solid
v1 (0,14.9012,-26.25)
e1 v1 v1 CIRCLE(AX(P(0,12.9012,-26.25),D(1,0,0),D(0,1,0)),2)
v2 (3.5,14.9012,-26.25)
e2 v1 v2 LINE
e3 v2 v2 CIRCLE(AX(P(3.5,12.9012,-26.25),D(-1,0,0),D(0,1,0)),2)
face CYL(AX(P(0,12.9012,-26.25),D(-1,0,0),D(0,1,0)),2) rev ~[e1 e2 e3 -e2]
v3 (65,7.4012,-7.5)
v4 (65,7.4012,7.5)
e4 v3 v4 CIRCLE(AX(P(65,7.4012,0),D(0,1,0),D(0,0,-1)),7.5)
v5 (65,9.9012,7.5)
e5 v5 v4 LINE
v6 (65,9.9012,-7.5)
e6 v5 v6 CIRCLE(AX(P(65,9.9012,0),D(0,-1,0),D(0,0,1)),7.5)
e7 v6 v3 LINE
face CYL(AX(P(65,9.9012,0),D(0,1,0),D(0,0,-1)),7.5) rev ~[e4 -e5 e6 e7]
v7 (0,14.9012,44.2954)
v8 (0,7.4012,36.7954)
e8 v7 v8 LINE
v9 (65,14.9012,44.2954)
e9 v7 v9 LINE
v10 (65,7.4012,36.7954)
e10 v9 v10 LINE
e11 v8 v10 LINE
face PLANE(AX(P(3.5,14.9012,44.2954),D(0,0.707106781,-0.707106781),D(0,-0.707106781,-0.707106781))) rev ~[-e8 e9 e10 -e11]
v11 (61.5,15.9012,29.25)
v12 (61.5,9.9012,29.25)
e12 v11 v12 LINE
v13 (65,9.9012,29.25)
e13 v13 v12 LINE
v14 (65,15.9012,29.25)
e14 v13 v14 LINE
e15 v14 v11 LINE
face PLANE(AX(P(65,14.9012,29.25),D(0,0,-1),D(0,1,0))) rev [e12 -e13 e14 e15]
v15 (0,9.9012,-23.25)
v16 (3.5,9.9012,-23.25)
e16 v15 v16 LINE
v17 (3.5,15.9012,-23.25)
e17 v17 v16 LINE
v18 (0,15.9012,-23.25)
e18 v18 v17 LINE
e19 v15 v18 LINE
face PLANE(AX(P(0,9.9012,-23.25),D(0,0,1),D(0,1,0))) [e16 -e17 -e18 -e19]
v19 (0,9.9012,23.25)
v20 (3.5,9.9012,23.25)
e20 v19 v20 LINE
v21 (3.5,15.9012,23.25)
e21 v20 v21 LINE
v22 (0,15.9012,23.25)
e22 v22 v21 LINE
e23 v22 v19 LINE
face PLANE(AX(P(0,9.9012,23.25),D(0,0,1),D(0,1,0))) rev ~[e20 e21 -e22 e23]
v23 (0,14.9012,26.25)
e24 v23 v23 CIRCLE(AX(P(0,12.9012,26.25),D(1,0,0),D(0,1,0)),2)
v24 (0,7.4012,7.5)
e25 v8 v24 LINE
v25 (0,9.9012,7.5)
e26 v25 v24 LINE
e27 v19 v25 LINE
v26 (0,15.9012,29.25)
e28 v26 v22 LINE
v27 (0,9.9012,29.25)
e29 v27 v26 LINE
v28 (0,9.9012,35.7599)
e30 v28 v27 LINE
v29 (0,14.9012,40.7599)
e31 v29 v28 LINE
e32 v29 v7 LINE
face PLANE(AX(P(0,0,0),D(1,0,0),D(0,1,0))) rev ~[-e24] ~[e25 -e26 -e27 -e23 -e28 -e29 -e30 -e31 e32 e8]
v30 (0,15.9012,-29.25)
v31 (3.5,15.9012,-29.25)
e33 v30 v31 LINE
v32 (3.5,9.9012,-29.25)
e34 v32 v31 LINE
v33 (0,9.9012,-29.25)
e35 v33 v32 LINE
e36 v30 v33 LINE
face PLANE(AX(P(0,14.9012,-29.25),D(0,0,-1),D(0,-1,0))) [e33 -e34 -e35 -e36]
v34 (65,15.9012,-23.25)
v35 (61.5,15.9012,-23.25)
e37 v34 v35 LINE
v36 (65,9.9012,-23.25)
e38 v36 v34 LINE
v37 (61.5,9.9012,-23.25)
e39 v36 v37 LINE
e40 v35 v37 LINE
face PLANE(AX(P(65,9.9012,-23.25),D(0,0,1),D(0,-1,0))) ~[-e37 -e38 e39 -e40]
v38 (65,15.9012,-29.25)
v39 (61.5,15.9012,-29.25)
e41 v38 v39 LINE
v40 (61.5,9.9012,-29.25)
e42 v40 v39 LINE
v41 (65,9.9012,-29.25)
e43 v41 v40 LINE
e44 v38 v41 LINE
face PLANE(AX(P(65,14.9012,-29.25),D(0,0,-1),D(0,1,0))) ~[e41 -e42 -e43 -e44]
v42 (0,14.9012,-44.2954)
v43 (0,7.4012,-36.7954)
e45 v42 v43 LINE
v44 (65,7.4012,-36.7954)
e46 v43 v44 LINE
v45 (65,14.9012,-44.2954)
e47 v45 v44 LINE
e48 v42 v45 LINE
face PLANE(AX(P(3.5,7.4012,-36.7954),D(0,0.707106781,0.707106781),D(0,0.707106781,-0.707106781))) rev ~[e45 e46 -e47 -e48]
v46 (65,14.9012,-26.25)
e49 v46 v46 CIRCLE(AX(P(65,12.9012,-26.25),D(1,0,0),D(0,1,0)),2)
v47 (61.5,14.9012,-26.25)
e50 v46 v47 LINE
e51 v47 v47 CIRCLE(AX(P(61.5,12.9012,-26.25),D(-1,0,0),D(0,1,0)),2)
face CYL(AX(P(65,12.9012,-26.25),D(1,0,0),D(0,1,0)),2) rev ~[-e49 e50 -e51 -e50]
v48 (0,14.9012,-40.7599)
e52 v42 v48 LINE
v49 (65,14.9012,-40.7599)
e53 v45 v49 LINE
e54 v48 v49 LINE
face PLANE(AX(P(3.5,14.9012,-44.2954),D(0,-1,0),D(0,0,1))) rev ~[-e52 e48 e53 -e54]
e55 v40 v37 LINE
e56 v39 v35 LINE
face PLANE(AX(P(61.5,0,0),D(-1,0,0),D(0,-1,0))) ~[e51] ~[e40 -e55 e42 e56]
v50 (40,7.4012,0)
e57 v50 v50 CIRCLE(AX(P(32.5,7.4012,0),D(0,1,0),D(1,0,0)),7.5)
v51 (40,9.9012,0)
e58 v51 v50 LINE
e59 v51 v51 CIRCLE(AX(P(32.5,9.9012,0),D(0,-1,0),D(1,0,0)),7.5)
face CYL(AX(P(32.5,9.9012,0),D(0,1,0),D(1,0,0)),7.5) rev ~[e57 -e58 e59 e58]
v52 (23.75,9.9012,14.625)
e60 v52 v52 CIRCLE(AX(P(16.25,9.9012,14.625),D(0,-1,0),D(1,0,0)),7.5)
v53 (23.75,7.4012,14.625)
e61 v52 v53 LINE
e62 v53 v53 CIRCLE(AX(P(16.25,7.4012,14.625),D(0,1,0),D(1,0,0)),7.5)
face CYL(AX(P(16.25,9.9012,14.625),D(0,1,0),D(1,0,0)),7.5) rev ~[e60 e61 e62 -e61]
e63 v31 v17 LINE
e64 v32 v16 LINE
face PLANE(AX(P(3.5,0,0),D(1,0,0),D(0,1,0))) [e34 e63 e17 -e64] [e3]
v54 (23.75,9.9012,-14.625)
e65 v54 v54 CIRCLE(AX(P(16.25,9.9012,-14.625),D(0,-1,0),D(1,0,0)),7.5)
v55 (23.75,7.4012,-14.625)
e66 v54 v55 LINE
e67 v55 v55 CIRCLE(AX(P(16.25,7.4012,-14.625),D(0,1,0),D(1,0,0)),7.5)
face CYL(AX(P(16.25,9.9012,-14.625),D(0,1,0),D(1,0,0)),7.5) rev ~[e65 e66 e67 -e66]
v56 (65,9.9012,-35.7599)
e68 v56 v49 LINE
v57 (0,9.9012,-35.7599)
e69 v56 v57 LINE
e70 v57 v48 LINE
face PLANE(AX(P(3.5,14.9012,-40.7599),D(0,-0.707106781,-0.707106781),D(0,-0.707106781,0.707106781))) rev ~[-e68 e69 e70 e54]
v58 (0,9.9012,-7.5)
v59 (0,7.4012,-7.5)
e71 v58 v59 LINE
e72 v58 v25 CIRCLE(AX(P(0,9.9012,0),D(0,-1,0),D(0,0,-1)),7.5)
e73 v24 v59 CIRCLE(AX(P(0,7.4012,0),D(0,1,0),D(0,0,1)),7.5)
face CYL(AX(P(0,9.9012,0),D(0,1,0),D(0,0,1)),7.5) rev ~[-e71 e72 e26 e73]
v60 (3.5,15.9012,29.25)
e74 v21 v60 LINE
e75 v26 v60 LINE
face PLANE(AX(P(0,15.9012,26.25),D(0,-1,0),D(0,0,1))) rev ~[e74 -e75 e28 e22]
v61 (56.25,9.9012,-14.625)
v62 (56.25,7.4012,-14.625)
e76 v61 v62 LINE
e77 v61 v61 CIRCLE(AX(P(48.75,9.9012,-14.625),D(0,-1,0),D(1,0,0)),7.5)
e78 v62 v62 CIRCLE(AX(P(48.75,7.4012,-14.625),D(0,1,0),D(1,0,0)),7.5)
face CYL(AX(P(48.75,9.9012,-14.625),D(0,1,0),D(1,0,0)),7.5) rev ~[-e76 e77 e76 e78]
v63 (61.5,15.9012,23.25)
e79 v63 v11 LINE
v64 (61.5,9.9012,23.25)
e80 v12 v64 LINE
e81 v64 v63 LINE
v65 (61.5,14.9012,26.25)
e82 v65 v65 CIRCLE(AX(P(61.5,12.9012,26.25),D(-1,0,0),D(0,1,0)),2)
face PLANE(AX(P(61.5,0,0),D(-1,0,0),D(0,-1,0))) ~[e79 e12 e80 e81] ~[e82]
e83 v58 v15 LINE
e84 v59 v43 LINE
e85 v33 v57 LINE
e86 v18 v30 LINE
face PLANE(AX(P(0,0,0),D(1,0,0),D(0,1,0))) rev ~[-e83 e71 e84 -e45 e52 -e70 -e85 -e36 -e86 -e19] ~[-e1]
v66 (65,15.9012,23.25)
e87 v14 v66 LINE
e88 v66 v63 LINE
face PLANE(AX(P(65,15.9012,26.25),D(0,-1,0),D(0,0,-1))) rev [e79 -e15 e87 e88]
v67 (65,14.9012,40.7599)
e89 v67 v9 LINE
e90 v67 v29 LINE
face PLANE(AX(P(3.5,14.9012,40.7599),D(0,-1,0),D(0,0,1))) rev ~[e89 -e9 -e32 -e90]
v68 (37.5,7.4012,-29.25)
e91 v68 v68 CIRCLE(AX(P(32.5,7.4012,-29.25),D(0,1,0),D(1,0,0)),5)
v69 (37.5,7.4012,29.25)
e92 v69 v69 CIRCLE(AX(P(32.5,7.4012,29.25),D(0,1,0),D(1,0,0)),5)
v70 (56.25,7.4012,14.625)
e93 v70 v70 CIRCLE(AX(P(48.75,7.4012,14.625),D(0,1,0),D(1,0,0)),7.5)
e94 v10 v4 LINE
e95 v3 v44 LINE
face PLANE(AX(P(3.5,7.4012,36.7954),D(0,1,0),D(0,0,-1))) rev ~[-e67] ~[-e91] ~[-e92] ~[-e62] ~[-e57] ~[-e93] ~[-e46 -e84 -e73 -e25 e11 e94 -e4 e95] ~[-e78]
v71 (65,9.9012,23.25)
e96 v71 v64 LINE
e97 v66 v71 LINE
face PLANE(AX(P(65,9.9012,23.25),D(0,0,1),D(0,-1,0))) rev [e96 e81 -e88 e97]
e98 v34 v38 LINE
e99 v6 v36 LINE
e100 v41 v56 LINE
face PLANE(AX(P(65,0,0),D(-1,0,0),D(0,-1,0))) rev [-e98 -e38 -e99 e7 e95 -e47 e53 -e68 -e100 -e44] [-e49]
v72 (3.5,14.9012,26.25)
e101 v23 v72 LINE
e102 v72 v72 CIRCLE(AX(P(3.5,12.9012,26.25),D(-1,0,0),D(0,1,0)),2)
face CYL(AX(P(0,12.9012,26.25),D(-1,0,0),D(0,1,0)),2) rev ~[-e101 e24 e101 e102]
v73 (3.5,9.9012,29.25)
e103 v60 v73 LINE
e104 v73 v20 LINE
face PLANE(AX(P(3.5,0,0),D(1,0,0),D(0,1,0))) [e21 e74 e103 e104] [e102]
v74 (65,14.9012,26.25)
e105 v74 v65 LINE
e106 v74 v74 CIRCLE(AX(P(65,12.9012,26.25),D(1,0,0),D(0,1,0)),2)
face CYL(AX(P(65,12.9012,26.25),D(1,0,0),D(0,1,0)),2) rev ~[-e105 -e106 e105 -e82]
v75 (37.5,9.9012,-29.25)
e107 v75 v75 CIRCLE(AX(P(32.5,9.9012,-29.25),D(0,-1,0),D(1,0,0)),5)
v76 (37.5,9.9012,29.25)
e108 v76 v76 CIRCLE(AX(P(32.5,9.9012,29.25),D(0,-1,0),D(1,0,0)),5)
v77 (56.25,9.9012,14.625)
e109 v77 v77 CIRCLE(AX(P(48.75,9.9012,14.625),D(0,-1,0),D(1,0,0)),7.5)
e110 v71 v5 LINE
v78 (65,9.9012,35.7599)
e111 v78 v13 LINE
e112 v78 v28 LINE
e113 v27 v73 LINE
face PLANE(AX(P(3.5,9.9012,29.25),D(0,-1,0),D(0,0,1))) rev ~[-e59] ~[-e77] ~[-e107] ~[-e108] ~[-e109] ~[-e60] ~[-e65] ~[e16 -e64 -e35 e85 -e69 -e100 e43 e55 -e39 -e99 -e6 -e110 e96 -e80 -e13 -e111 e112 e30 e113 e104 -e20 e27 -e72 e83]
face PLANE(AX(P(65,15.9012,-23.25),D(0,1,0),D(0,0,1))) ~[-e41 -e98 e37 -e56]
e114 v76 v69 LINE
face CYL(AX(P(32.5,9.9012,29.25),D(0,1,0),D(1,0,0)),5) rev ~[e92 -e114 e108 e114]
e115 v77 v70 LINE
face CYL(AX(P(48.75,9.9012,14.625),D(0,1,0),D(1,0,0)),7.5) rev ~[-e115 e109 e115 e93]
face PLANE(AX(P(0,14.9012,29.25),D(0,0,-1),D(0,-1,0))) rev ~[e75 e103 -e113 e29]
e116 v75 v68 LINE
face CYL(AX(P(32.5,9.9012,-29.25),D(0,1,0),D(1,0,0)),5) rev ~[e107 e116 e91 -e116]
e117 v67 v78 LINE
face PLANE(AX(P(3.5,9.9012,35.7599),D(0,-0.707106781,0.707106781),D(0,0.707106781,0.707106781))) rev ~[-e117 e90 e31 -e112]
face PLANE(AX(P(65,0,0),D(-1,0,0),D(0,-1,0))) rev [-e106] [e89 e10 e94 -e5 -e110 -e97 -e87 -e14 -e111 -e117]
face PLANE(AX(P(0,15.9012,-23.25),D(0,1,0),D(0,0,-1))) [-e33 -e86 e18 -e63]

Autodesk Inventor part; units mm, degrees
ref_plane "YZ Plane" through (0, 0, 0) normal (1, 0, 0) x (0, 1, 0)
ref_plane "XZ Plane" through (0, 0, 0) normal (0, 1, 0) x (-1, 0, 0)
ref_plane "XY Plane" through (0, 0, 0) normal (0, 0, 1) x (1, 0, 0)
sketch "Sketch1" plane through (0, 0, 0) normal (1, 0, 0) x (0, 1, 0)
  line L0 (21.7077, 51.1019) -> (7.4012, 36.7954)
  line L1 (7.4012, 36.7954) -> (7.4012, 0)
  line L2 (21.7077, 51.1019) -> (21.7077, 0)
  line L3 (7.4012, -36.7954) -> (7.4012, 0)
  line L4 (21.7077, -51.1019) -> (21.7077, 0)
  line L5 (21.7077, -51.1019) -> (7.4012, -36.7954)
  line L6 (21.7077, -51.1019) -> (21.7077, 51.1019)
  line L7 (17.1717, -14.2524) -> (13.4217, -14.2524)
  line L8 (13.4217, -14.2524) -> (11.5467, -17.5)
  line L9 (19.0467, -17.5) -> (17.1717, -14.2524)
  circle A0 centre (15.2967, -17.5) radius 3.75
  line L10 (17.1717, -20.7476) -> (19.0467, -17.5)
  line L11 (11.5467, -17.5) -> (13.4217, -20.7476)
  line L12 (13.4217, -20.7476) -> (17.1717, -20.7476)
  line L13 (17.1717, -31.7524) -> (13.4217, -31.7524)
  line L14 (19.0467, -35) -> (17.1717, -31.7524)
  line L15 (13.4217, -31.7524) -> (11.5467, -35)
  line L16 (13.4217, -38.2476) -> (17.1717, -38.2476)
  line L17 (17.1717, -38.2476) -> (19.0467, -35)
  line L18 (11.5467, -35) -> (13.4217, -38.2476)
  circle A1 centre (15.2967, -35) radius 3.75
  circle A2 centre (15.2967, 0) radius 3.75
  line L19 (13.4217, -3.2476) -> (17.1717, -3.2476)
  line L20 (17.1717, -3.2476) -> (19.0467, 0)
  line L21 (11.5467, 0) -> (13.4217, -3.2476)
  line L22 (13.4217, 3.2476) -> (11.5467, 0)
  line L23 (17.1717, 3.2476) -> (13.4217, 3.2476)
  line L24 (19.0467, 0) -> (17.1717, 3.2476)
  line L25 (13.4217, 14.2524) -> (17.1717, 14.2524)
  line L26 (11.5467, 17.5) -> (13.4217, 14.2524)
  line L27 (17.1717, 14.2524) -> (19.0467, 17.5)
  circle A3 centre (15.2967, 17.5) radius 3.75
  line L28 (19.0467, 17.5) -> (17.1717, 20.7476)
  line L29 (17.1717, 20.7476) -> (13.4217, 20.7476)
  line L30 (13.4217, 20.7476) -> (11.5467, 17.5)
  circle A4 centre (15.2967, 35) radius 3.75
  line L31 (13.4217, 31.7524) -> (17.1717, 31.7524)
  line L32 (11.5467, 35) -> (13.4217, 31.7524)
  line L33 (17.1717, 31.7524) -> (19.0467, 35)
  line L34 (19.0467, 35) -> (17.1717, 38.2476)
  line L35 (13.4217, 38.2476) -> (11.5467, 35)
  line L36 (17.1717, 38.2476) -> (13.4217, 38.2476)
  line L37 (21.7077, 47.5664) -> (7.4012, 33.2599)
  line L38 (9.9012, 39.2954) -> (9.9012, -39.2954)
  line L39 (7.4012, -33.2599) -> (21.7077, -47.5664)
  line L40 (15.2967, 35) -> (9.9012, 35)
  line L41 (9.9012, 26.25) -> (16.1703, 26.25)
  circle A5 centre (12.9012, 26.25) radius 2
  line L42 (9.9012, 23.25) -> (15.9012, 23.25)
  line L43 (15.9012, 23.25) -> (15.9012, 29.25)
  line L44 (15.9012, 29.25) -> (9.9012, 29.25)
  line L45 (9.9012, 29.25) -> (9.9012, 23.25)
  line L46 (9.9012, 23.25) -> (15.9012, 29.25) construction
  line L47 (15.9012, 23.25) -> (9.9012, 29.25) construction
  line L48 (9.9012, -26.25) -> (17.1717, -26.25)
  circle A6 centre (12.9012, -26.25) radius 2
  line L49 (15.9012, -29.25) -> (9.9012, -29.25)
  line L50 (9.9012, -29.25) -> (9.9012, -23.25)
  line L51 (9.9012, -23.25) -> (15.9012, -23.25)
  line L52 (15.9012, -23.25) -> (15.9012, -29.25)
  line L53 (15.9012, -29.25) -> (9.9012, -23.25) construction
  line L54 (9.9012, -29.25) -> (15.9012, -23.25) construction
  line L55 (15.9012, 53.3729) -> (15.9012, -51.1019)
  line L56 (9.9012, 26.25) -> (7.4012, 26.25)
  line L57 (14.9012, -60.8562) -> (14.9012, 66.1701)
  point P0 (9.9012, 35.7599)
  point P1 (9.9012, -35.7599)
  point P2 (14.9012, 40.7599)
  point P3 (14.9012, 44.2954)
  point P4 (14.9012, -44.2954)
  point P5 (14.9012, -40.7599)
  dimension "d33" = 2.5
  dimension "d34" = 2.5
  dimension "d35" = 2.5
  dimension "d36" = 8.75
  dimension "d37" = 4
  dimension "d38" = 3
  dimension "d39" = 6
  dimension "d40" = 8.75
  dimension "d41" = 4
  dimension "d42" = 3
  dimension "d43" = 6
  dimension "d48" = 8.5
  dimension "d49" = 7.5
extrude "Extrusion1" add sketch "Sketch1" along normal blind 3.5 contours L38 L37 L1 L0 | L0 L57 L37 L38 | L38 L56 L1 L37 | L56 L38 L39 L3 L1 | L44 L57 A5 L41 L38 | L41 A5 L57 L42 L38 | L44 L43 L41 L57 | L39 L38 L5 L3 | L41 L43 L42 L57 | L39 L57 L5 L38 | L51 L57 A6 L48 L38 | L38 L48 A6 L57 L49 | L51 L52 L48 L57 | L57 L48 L52 L49
sketch "Sketch2" plane through (3.5, 0, 0) normal (1, 0, 0) x (0, 0, -1)
  line L0 (-44.2954, 14.9012) -> (-36.7954, 7.4012) projected
  line L1 (-36.7954, 7.4012) -> (36.7954, 7.4012) projected
  line L2 (36.7954, 7.4012) -> (44.2954, 14.9012) projected
  line L3 (40.7599, 14.9012) -> (35.7599, 9.9012) projected
  line L4 (35.7599, 9.9012) -> (29.25, 9.9012) projected
  line L5 (29.25, 9.9012) -> (29.25, 15.9012) projected
  line L6 (29.25, 15.9012) -> (23.25, 15.9012) projected
  line L7 (23.25, 15.9012) -> (23.25, 9.9012) projected
  line L8 (23.25, 9.9012) -> (-23.25, 9.9012) projected
  line L9 (-23.25, 9.9012) -> (-23.25, 15.9012) projected
  line L10 (-23.25, 15.9012) -> (-29.25, 15.9012) projected
  line L11 (-29.25, 15.9012) -> (-29.25, 9.9012) projected
  line L12 (-29.25, 9.9012) -> (-35.7599, 9.9012) projected
  line L13 (-35.7599, 9.9012) -> (-40.7599, 14.9012) projected
  circle A0 centre (-26.25, 12.9012) radius 2 projected
  circle A1 centre (26.25, 12.9012) radius 2 projected
  line L14 (-29.25, 9.9012) -> (-23.25, 9.9012)
  line L15 (35.7599, 9.9012) -> (29.25, 9.9012) projected
  line L16 (23.25, 15.9012) -> (23.25, 9.9012) projected
  line L17 (29.25, 9.9012) -> (23.25, 9.9012)
  line L18 (-40.7599, 14.9012) -> (-44.2954, 14.9012) projected
  line L19 (44.2954, 14.9012) -> (40.7599, 14.9012) projected
  point P0 (0, 0)
extrude "Extrusion2" add sketch "Sketch2" along normal blind 29 contours L18 L13 L12 L14 L8 L17 L4 L3 L19 L2 L1 L0
mirror "Mirror1" about plane through (32.5, 11.1512, 0) normal (1, 0, 0)
sketch "Sketch4" plane through (0, 9.9012, 23.25) normal (0, 1, 0) x (1, 0, 0)
  line L0 (0, 59.0099) -> (0, 52.5) projected
  line L1 (0, 52.5) -> (3.5, 52.5) projected
  line L2 (3.5, 46.5) -> (3.5, 52.5) projected
  line L3 (0, 46.5) -> (3.5, 46.5) projected
  line L4 (0, 46.5) -> (0, 0) projected
  line L5 (0, 0) -> (3.5, 0) projected
  line L6 (3.5, -6) -> (3.5, 0) projected
  line L7 (0, -6) -> (3.5, -6) projected
  line L8 (0, -6) -> (0, -12.5099) projected
  line L9 (0, -12.5099) -> (65, -12.5099) projected
  line L10 (65, -6) -> (65, -12.5099) projected
  line L11 (65, -6) -> (61.5, -6) projected
  line L12 (61.5, -6) -> (61.5, 0) projected
  line L13 (65, 0) -> (61.5, 0) projected
  line L14 (65, 46.5) -> (65, 0) projected
  line L15 (65, 46.5) -> (61.5, 46.5) projected
  line L16 (61.5, 46.5) -> (61.5, 52.5) projected
  line L17 (65, 52.5) -> (61.5, 52.5) projected
  line L18 (65, 59.0099) -> (65, 52.5) projected
  line L19 (0, 59.0099) -> (65, 59.0099) projected
  line L20 (0, 52.5) -> (65, 52.5)
  line L21 (65, -13.5454) -> (65, 60.0454) projected
  line L22 (0, -6) -> (65, -6)
  line L23 (0, 52.5) -> (65, -6)
  line L24 (0, -6) -> (3.5, -6) projected
  line L25 (0, -6) -> (65, 52.5)
  line L26 (32.5, 52.5) -> (32.5, -6)
  line L27 (65, 46.5) -> (65, 0) projected
  line L28 (65, 23.25) -> (0, 23.25)
  line L29 (65, 23.25) -> (32.5, 52.5)
  line L30 (0, 23.25) -> (32.5, 52.5)
  line L31 (0, 23.25) -> (32.5, -6)
  line L32 (32.5, -6) -> (65, 23.25)
  circle A0 centre (16.25, 37.875) radius 7.5
  circle A1 centre (32.5, 23.25) radius 7.5
  circle A2 centre (48.75, 37.875) radius 7.5
  circle A3 centre (16.25, 8.625) radius 7.5
  circle A4 centre (48.75, 8.625) radius 7.5
  line L33 (16.25, 59.0099) -> (16.25, -12.5099)
  line L34 (0, -12.5099) -> (65, -12.5099) projected
  line L35 (48.75, -12.5099) -> (48.75, 59.0099)
  line L36 (0, 59.0099) -> (65, 59.0099) projected
  line L37 (32.5, 59.0099) -> (32.5, -12.5099)
  circle A5 centre (32.5, 52.5) radius 5
  circle A6 centre (32.5, -6) radius 5
  arc A7 (0, 15.75) -> (0, 30.75) centre (0, 23.25) ccw
  arc A8 (65, 30.75) -> (65, 15.75) centre (65, 23.25) ccw
  dimension "d62" = 15
  dimension "d63" = 15
  dimension "d64" = 15
  dimension "d65" = 15
  dimension "d66" = 15
  dimension "d69" = 10
  dimension "d70" = 10
  dimension "d71" = 15
  dimension "d72" = 15
extrude "Extrusion3" cut sketch "Sketch4" against normal blind 10 contours A0 L33 L23 | L23 L30 A0 | A5 L20 L37 | L37 L20 A5 | L20 L30 A5 | A0 L30 L33 | L30 A0 L23 | L33 A0 L30 | L23 A0 L33 | L29 A5 L26 | L20 A5 L29 | L26 A5 L30 | A7 L30 L4 | A7 L28 L30 | L35 L29 A2 | A2 L25 L35 | L31 A7 L4 | L28 A7 L31 | A1 L26 L23 | L23 L28 A1 | A2 L29 L25 | L29 L25 A2 | L35 A2 L25 | L29 A2 L35 | A1 L25 L26 | L28 A1 L23 | L26 A1 L25 | L23 A1 L26 | L25 A1 L28 | L25 A1 L28 | L33 L31 A3 | A3 L25 L33 | L14 L29 A8 | L31 L25 A3 | A3 L31 L25 | L33 A3 L25 | L31 A3 L33 | L32 A8 L28 | L28 A8 L29 | L14 A8 L32 | A4 L35 L23 | L23 L32 A4 | A6 L32 L26 | L26 L31 A6 | A4 L32 L35 | L32 A4 L23 | L35 A4 L32 | L23 A4 L35 | L32 A6 L22 | L37 A6 L22 | L22 A6 L31 | L22 A6 L37
properties part number "Bed"
